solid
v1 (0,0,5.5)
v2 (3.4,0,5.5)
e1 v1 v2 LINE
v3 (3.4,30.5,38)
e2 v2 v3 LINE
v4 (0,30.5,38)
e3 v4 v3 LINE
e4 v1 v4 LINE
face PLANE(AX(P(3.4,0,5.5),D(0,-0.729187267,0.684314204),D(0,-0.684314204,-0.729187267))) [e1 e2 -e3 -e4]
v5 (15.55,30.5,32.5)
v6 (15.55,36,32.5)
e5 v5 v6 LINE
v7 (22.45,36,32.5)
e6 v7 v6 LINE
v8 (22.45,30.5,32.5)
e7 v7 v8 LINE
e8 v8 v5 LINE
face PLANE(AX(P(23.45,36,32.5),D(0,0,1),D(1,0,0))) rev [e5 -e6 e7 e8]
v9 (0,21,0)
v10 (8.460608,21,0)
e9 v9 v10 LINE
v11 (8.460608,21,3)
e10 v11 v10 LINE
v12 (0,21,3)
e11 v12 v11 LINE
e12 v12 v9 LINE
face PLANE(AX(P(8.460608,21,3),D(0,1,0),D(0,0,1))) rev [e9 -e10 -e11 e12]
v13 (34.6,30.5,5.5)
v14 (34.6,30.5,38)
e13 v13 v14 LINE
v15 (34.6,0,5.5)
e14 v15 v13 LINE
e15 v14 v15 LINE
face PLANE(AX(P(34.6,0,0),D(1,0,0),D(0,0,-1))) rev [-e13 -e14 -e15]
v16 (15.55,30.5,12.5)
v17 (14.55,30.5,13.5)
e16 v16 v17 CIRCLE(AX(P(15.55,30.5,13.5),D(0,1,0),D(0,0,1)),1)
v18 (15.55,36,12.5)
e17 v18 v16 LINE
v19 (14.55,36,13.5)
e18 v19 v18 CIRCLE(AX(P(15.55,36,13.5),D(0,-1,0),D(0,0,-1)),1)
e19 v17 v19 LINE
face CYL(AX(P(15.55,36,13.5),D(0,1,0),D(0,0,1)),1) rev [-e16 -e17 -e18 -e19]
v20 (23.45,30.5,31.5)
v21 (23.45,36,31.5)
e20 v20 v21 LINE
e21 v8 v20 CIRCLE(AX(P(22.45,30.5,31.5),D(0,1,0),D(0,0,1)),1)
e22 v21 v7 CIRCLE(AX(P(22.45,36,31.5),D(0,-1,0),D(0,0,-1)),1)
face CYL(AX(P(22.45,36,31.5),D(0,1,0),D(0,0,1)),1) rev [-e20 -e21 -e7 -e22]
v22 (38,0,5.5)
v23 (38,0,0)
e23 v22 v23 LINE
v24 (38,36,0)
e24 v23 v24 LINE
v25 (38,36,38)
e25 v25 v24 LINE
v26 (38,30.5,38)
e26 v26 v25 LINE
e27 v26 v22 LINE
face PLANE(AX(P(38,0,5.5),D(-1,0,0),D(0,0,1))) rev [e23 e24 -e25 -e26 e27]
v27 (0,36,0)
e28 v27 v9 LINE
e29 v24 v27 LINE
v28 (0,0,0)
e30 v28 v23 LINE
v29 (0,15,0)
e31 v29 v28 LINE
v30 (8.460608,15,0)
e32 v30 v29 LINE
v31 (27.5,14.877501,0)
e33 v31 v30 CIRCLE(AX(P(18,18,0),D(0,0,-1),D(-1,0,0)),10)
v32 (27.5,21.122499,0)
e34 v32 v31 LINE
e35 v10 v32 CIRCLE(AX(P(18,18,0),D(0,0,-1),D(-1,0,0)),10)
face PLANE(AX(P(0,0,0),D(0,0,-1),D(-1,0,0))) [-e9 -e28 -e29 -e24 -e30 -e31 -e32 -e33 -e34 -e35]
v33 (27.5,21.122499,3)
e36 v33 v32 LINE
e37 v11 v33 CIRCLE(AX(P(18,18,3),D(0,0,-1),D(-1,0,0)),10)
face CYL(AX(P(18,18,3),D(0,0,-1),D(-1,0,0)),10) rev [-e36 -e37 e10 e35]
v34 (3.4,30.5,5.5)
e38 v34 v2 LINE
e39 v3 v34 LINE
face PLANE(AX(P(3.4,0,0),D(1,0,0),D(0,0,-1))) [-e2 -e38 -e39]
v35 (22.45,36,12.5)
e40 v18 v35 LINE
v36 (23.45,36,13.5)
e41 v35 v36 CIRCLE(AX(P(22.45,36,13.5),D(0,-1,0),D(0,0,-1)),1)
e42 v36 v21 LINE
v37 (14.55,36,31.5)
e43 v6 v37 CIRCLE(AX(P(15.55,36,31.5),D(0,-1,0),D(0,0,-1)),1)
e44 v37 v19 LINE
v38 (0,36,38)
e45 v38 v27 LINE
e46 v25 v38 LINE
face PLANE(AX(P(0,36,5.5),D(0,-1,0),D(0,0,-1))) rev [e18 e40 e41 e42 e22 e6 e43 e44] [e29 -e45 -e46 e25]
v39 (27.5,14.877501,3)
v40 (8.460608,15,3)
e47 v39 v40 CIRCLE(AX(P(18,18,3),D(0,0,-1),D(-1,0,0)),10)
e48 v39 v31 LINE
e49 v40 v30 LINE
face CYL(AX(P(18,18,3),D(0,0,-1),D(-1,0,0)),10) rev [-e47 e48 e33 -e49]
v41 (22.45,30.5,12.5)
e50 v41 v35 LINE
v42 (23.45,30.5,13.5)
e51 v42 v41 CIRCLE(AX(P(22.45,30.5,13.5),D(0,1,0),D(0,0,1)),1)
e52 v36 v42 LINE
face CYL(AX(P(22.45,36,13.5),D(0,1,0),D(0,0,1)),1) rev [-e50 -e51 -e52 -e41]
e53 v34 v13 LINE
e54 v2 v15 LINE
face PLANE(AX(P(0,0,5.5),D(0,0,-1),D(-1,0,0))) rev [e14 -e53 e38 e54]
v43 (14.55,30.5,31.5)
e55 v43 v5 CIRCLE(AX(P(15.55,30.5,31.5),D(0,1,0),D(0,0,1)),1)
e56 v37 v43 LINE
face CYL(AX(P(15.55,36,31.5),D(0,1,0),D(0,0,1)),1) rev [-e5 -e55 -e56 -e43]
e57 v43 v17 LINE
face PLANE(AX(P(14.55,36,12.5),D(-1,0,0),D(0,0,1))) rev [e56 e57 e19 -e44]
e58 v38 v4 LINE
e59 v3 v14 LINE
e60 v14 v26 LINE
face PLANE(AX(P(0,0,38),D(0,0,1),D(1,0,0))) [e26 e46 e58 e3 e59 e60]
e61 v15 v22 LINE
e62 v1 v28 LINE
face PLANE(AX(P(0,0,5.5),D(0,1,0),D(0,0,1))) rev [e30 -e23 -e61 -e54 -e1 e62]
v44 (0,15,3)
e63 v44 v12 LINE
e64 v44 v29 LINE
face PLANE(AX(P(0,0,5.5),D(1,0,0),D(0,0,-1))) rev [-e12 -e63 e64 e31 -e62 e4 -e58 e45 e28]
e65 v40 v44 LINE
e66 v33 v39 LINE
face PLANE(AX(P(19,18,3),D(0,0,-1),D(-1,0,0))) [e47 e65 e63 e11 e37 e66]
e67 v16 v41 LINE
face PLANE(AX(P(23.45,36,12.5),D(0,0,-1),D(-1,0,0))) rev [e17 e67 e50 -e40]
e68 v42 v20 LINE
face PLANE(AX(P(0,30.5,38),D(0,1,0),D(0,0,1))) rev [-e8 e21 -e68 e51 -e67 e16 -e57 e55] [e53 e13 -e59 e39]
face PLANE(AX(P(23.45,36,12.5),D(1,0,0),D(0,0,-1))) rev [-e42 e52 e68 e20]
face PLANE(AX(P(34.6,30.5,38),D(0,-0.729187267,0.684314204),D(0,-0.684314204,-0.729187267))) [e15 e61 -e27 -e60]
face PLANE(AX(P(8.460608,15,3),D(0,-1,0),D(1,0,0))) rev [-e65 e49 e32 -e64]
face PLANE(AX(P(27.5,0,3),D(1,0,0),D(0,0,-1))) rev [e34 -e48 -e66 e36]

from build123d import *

# Parameters (mm, degrees)
SKETCH1_W            = 38
SKETCH1_H            = 36
BOSS_EXTRUDE1_DEPTH  = 5.5
SKETCH5_W            = 38
SKETCH5_H            = 5.5
BOSS_EXTRUDE5_DEPTH  = 32.5
BOSS_EXTRUDE6_DEPTH  = 3.4
BOSS_EXTRUDE7_DEPTH  = 3.4
SKETCH9_W            = 8.9
SKETCH9_H            = 20
CUT_EXTRUDE1_DEPTH   = 62.791989772
FILLET1_R            = 1
SKETCH12_OUTSIDE_W   = 52.936
SKETCH12_OUTSIDE_H   = 50.936
SKETCH12_OUTSIDE_W_2 = 38
SKETCH12_OUTSIDE_H_2 = 36
CUT_EXTRUDE3_DEPTH   = 3
SKETCH19_W           = 8.460607986
SKETCH19_H           = 6
CUT_EXTRUDE4_DEPTH   = 3


with BuildPart() as part:
    # Sketch1 → Boss-Extrude1 (new body)
    with BuildSketch(Plane.XY):
        with Locations((19, 18)):
            Rectangle(SKETCH1_W, SKETCH1_H)
    extrude(amount=BOSS_EXTRUDE1_DEPTH)

    # Sketch5 → Boss-Extrude5 (add)
    with BuildSketch(Plane.XY.offset(5.5)):
        with Locations((19, 33.25)):
            Rectangle(SKETCH5_W, SKETCH5_H)
    extrude(amount=BOSS_EXTRUDE5_DEPTH)

    # Sketch7 → Boss-Extrude6 (add)
    with BuildSketch(Plane.ZY):
        Polygon((5.5, 0), (38, 30.5), (5.5, 30.5), align=None)
    extrude(amount=-BOSS_EXTRUDE6_DEPTH)

    # Sketch8 → Boss-Extrude7 (add)
    with BuildSketch(Plane(origin=(38, 0, 0), x_dir=(0, 0, -1), z_dir=(1, 0, 0))):
        Polygon((-5.5, 0), (-5.5, 30.5), (-38, 30.5), align=None)
    extrude(amount=-BOSS_EXTRUDE7_DEPTH)

    # Sketch9 → Cut-Extrude1 (cut, through all)
    with BuildSketch(Plane(origin=(0, 30.5, 0), x_dir=(-1, 0, 0), z_dir=(0, -1, 0))):
        with Locations((-19, -22.5)):
            Rectangle(SKETCH9_W, SKETCH9_H)
    extrude(amount=-CUT_EXTRUDE1_DEPTH, mode=Mode.SUBTRACT)

    # Fillet1
    fillet1_edges = [part.edges().sort_by_distance(p)[0] for p in [
        (23.45, 33.25, 32.5),
        (14.55, 33.25, 32.5),
        (23.45, 33.25, 12.5),
        (14.55, 33.25, 12.5),
    ]]
    fillet(fillet1_edges, radius=FILLET1_R)

    # Sketch12 outside → Cut-Extrude3 (cut)
    # profile 1 of 2: a face of its own
    with BuildSketch(Plane(origin=(0, 0, 0), x_dir=(-1, 0, 0), z_dir=(0, 0, -1))):
        with Locations((-19, 18)):
            Rectangle(SKETCH12_OUTSIDE_W, SKETCH12_OUTSIDE_H)
        with Locations((-19, 18)):
            Rectangle(SKETCH12_OUTSIDE_W_2, SKETCH12_OUTSIDE_H_2, mode=Mode.SUBTRACT)
    # profile 2 of 2: a face of its own
    with BuildSketch(Plane(origin=(0, 0, 0), x_dir=(-1, 0, 0), z_dir=(0, 0, -1))):
        with BuildLine():
            Line((-27.5, 14.877501001), (-27.5, 21.122498999))
            ThreePointArc((-27.5, 21.122498999), (-8, 18), (-27.5, 14.877501001))
        make_face()
    extrude(amount=-CUT_EXTRUDE3_DEPTH, mode=Mode.SUBTRACT)

    # Sketch19 → Cut-Extrude4 (cut)
    with BuildSketch(Plane(origin=(0, 0, 0), x_dir=(-1, 0, 0), z_dir=(0, 0, -1))):
        with Locations((-4.230303993, 18)):
            Rectangle(SKETCH19_W, SKETCH19_H)
    extrude(amount=-CUT_EXTRUDE4_DEPTH, mode=Mode.SUBTRACT)


solid = part.part
